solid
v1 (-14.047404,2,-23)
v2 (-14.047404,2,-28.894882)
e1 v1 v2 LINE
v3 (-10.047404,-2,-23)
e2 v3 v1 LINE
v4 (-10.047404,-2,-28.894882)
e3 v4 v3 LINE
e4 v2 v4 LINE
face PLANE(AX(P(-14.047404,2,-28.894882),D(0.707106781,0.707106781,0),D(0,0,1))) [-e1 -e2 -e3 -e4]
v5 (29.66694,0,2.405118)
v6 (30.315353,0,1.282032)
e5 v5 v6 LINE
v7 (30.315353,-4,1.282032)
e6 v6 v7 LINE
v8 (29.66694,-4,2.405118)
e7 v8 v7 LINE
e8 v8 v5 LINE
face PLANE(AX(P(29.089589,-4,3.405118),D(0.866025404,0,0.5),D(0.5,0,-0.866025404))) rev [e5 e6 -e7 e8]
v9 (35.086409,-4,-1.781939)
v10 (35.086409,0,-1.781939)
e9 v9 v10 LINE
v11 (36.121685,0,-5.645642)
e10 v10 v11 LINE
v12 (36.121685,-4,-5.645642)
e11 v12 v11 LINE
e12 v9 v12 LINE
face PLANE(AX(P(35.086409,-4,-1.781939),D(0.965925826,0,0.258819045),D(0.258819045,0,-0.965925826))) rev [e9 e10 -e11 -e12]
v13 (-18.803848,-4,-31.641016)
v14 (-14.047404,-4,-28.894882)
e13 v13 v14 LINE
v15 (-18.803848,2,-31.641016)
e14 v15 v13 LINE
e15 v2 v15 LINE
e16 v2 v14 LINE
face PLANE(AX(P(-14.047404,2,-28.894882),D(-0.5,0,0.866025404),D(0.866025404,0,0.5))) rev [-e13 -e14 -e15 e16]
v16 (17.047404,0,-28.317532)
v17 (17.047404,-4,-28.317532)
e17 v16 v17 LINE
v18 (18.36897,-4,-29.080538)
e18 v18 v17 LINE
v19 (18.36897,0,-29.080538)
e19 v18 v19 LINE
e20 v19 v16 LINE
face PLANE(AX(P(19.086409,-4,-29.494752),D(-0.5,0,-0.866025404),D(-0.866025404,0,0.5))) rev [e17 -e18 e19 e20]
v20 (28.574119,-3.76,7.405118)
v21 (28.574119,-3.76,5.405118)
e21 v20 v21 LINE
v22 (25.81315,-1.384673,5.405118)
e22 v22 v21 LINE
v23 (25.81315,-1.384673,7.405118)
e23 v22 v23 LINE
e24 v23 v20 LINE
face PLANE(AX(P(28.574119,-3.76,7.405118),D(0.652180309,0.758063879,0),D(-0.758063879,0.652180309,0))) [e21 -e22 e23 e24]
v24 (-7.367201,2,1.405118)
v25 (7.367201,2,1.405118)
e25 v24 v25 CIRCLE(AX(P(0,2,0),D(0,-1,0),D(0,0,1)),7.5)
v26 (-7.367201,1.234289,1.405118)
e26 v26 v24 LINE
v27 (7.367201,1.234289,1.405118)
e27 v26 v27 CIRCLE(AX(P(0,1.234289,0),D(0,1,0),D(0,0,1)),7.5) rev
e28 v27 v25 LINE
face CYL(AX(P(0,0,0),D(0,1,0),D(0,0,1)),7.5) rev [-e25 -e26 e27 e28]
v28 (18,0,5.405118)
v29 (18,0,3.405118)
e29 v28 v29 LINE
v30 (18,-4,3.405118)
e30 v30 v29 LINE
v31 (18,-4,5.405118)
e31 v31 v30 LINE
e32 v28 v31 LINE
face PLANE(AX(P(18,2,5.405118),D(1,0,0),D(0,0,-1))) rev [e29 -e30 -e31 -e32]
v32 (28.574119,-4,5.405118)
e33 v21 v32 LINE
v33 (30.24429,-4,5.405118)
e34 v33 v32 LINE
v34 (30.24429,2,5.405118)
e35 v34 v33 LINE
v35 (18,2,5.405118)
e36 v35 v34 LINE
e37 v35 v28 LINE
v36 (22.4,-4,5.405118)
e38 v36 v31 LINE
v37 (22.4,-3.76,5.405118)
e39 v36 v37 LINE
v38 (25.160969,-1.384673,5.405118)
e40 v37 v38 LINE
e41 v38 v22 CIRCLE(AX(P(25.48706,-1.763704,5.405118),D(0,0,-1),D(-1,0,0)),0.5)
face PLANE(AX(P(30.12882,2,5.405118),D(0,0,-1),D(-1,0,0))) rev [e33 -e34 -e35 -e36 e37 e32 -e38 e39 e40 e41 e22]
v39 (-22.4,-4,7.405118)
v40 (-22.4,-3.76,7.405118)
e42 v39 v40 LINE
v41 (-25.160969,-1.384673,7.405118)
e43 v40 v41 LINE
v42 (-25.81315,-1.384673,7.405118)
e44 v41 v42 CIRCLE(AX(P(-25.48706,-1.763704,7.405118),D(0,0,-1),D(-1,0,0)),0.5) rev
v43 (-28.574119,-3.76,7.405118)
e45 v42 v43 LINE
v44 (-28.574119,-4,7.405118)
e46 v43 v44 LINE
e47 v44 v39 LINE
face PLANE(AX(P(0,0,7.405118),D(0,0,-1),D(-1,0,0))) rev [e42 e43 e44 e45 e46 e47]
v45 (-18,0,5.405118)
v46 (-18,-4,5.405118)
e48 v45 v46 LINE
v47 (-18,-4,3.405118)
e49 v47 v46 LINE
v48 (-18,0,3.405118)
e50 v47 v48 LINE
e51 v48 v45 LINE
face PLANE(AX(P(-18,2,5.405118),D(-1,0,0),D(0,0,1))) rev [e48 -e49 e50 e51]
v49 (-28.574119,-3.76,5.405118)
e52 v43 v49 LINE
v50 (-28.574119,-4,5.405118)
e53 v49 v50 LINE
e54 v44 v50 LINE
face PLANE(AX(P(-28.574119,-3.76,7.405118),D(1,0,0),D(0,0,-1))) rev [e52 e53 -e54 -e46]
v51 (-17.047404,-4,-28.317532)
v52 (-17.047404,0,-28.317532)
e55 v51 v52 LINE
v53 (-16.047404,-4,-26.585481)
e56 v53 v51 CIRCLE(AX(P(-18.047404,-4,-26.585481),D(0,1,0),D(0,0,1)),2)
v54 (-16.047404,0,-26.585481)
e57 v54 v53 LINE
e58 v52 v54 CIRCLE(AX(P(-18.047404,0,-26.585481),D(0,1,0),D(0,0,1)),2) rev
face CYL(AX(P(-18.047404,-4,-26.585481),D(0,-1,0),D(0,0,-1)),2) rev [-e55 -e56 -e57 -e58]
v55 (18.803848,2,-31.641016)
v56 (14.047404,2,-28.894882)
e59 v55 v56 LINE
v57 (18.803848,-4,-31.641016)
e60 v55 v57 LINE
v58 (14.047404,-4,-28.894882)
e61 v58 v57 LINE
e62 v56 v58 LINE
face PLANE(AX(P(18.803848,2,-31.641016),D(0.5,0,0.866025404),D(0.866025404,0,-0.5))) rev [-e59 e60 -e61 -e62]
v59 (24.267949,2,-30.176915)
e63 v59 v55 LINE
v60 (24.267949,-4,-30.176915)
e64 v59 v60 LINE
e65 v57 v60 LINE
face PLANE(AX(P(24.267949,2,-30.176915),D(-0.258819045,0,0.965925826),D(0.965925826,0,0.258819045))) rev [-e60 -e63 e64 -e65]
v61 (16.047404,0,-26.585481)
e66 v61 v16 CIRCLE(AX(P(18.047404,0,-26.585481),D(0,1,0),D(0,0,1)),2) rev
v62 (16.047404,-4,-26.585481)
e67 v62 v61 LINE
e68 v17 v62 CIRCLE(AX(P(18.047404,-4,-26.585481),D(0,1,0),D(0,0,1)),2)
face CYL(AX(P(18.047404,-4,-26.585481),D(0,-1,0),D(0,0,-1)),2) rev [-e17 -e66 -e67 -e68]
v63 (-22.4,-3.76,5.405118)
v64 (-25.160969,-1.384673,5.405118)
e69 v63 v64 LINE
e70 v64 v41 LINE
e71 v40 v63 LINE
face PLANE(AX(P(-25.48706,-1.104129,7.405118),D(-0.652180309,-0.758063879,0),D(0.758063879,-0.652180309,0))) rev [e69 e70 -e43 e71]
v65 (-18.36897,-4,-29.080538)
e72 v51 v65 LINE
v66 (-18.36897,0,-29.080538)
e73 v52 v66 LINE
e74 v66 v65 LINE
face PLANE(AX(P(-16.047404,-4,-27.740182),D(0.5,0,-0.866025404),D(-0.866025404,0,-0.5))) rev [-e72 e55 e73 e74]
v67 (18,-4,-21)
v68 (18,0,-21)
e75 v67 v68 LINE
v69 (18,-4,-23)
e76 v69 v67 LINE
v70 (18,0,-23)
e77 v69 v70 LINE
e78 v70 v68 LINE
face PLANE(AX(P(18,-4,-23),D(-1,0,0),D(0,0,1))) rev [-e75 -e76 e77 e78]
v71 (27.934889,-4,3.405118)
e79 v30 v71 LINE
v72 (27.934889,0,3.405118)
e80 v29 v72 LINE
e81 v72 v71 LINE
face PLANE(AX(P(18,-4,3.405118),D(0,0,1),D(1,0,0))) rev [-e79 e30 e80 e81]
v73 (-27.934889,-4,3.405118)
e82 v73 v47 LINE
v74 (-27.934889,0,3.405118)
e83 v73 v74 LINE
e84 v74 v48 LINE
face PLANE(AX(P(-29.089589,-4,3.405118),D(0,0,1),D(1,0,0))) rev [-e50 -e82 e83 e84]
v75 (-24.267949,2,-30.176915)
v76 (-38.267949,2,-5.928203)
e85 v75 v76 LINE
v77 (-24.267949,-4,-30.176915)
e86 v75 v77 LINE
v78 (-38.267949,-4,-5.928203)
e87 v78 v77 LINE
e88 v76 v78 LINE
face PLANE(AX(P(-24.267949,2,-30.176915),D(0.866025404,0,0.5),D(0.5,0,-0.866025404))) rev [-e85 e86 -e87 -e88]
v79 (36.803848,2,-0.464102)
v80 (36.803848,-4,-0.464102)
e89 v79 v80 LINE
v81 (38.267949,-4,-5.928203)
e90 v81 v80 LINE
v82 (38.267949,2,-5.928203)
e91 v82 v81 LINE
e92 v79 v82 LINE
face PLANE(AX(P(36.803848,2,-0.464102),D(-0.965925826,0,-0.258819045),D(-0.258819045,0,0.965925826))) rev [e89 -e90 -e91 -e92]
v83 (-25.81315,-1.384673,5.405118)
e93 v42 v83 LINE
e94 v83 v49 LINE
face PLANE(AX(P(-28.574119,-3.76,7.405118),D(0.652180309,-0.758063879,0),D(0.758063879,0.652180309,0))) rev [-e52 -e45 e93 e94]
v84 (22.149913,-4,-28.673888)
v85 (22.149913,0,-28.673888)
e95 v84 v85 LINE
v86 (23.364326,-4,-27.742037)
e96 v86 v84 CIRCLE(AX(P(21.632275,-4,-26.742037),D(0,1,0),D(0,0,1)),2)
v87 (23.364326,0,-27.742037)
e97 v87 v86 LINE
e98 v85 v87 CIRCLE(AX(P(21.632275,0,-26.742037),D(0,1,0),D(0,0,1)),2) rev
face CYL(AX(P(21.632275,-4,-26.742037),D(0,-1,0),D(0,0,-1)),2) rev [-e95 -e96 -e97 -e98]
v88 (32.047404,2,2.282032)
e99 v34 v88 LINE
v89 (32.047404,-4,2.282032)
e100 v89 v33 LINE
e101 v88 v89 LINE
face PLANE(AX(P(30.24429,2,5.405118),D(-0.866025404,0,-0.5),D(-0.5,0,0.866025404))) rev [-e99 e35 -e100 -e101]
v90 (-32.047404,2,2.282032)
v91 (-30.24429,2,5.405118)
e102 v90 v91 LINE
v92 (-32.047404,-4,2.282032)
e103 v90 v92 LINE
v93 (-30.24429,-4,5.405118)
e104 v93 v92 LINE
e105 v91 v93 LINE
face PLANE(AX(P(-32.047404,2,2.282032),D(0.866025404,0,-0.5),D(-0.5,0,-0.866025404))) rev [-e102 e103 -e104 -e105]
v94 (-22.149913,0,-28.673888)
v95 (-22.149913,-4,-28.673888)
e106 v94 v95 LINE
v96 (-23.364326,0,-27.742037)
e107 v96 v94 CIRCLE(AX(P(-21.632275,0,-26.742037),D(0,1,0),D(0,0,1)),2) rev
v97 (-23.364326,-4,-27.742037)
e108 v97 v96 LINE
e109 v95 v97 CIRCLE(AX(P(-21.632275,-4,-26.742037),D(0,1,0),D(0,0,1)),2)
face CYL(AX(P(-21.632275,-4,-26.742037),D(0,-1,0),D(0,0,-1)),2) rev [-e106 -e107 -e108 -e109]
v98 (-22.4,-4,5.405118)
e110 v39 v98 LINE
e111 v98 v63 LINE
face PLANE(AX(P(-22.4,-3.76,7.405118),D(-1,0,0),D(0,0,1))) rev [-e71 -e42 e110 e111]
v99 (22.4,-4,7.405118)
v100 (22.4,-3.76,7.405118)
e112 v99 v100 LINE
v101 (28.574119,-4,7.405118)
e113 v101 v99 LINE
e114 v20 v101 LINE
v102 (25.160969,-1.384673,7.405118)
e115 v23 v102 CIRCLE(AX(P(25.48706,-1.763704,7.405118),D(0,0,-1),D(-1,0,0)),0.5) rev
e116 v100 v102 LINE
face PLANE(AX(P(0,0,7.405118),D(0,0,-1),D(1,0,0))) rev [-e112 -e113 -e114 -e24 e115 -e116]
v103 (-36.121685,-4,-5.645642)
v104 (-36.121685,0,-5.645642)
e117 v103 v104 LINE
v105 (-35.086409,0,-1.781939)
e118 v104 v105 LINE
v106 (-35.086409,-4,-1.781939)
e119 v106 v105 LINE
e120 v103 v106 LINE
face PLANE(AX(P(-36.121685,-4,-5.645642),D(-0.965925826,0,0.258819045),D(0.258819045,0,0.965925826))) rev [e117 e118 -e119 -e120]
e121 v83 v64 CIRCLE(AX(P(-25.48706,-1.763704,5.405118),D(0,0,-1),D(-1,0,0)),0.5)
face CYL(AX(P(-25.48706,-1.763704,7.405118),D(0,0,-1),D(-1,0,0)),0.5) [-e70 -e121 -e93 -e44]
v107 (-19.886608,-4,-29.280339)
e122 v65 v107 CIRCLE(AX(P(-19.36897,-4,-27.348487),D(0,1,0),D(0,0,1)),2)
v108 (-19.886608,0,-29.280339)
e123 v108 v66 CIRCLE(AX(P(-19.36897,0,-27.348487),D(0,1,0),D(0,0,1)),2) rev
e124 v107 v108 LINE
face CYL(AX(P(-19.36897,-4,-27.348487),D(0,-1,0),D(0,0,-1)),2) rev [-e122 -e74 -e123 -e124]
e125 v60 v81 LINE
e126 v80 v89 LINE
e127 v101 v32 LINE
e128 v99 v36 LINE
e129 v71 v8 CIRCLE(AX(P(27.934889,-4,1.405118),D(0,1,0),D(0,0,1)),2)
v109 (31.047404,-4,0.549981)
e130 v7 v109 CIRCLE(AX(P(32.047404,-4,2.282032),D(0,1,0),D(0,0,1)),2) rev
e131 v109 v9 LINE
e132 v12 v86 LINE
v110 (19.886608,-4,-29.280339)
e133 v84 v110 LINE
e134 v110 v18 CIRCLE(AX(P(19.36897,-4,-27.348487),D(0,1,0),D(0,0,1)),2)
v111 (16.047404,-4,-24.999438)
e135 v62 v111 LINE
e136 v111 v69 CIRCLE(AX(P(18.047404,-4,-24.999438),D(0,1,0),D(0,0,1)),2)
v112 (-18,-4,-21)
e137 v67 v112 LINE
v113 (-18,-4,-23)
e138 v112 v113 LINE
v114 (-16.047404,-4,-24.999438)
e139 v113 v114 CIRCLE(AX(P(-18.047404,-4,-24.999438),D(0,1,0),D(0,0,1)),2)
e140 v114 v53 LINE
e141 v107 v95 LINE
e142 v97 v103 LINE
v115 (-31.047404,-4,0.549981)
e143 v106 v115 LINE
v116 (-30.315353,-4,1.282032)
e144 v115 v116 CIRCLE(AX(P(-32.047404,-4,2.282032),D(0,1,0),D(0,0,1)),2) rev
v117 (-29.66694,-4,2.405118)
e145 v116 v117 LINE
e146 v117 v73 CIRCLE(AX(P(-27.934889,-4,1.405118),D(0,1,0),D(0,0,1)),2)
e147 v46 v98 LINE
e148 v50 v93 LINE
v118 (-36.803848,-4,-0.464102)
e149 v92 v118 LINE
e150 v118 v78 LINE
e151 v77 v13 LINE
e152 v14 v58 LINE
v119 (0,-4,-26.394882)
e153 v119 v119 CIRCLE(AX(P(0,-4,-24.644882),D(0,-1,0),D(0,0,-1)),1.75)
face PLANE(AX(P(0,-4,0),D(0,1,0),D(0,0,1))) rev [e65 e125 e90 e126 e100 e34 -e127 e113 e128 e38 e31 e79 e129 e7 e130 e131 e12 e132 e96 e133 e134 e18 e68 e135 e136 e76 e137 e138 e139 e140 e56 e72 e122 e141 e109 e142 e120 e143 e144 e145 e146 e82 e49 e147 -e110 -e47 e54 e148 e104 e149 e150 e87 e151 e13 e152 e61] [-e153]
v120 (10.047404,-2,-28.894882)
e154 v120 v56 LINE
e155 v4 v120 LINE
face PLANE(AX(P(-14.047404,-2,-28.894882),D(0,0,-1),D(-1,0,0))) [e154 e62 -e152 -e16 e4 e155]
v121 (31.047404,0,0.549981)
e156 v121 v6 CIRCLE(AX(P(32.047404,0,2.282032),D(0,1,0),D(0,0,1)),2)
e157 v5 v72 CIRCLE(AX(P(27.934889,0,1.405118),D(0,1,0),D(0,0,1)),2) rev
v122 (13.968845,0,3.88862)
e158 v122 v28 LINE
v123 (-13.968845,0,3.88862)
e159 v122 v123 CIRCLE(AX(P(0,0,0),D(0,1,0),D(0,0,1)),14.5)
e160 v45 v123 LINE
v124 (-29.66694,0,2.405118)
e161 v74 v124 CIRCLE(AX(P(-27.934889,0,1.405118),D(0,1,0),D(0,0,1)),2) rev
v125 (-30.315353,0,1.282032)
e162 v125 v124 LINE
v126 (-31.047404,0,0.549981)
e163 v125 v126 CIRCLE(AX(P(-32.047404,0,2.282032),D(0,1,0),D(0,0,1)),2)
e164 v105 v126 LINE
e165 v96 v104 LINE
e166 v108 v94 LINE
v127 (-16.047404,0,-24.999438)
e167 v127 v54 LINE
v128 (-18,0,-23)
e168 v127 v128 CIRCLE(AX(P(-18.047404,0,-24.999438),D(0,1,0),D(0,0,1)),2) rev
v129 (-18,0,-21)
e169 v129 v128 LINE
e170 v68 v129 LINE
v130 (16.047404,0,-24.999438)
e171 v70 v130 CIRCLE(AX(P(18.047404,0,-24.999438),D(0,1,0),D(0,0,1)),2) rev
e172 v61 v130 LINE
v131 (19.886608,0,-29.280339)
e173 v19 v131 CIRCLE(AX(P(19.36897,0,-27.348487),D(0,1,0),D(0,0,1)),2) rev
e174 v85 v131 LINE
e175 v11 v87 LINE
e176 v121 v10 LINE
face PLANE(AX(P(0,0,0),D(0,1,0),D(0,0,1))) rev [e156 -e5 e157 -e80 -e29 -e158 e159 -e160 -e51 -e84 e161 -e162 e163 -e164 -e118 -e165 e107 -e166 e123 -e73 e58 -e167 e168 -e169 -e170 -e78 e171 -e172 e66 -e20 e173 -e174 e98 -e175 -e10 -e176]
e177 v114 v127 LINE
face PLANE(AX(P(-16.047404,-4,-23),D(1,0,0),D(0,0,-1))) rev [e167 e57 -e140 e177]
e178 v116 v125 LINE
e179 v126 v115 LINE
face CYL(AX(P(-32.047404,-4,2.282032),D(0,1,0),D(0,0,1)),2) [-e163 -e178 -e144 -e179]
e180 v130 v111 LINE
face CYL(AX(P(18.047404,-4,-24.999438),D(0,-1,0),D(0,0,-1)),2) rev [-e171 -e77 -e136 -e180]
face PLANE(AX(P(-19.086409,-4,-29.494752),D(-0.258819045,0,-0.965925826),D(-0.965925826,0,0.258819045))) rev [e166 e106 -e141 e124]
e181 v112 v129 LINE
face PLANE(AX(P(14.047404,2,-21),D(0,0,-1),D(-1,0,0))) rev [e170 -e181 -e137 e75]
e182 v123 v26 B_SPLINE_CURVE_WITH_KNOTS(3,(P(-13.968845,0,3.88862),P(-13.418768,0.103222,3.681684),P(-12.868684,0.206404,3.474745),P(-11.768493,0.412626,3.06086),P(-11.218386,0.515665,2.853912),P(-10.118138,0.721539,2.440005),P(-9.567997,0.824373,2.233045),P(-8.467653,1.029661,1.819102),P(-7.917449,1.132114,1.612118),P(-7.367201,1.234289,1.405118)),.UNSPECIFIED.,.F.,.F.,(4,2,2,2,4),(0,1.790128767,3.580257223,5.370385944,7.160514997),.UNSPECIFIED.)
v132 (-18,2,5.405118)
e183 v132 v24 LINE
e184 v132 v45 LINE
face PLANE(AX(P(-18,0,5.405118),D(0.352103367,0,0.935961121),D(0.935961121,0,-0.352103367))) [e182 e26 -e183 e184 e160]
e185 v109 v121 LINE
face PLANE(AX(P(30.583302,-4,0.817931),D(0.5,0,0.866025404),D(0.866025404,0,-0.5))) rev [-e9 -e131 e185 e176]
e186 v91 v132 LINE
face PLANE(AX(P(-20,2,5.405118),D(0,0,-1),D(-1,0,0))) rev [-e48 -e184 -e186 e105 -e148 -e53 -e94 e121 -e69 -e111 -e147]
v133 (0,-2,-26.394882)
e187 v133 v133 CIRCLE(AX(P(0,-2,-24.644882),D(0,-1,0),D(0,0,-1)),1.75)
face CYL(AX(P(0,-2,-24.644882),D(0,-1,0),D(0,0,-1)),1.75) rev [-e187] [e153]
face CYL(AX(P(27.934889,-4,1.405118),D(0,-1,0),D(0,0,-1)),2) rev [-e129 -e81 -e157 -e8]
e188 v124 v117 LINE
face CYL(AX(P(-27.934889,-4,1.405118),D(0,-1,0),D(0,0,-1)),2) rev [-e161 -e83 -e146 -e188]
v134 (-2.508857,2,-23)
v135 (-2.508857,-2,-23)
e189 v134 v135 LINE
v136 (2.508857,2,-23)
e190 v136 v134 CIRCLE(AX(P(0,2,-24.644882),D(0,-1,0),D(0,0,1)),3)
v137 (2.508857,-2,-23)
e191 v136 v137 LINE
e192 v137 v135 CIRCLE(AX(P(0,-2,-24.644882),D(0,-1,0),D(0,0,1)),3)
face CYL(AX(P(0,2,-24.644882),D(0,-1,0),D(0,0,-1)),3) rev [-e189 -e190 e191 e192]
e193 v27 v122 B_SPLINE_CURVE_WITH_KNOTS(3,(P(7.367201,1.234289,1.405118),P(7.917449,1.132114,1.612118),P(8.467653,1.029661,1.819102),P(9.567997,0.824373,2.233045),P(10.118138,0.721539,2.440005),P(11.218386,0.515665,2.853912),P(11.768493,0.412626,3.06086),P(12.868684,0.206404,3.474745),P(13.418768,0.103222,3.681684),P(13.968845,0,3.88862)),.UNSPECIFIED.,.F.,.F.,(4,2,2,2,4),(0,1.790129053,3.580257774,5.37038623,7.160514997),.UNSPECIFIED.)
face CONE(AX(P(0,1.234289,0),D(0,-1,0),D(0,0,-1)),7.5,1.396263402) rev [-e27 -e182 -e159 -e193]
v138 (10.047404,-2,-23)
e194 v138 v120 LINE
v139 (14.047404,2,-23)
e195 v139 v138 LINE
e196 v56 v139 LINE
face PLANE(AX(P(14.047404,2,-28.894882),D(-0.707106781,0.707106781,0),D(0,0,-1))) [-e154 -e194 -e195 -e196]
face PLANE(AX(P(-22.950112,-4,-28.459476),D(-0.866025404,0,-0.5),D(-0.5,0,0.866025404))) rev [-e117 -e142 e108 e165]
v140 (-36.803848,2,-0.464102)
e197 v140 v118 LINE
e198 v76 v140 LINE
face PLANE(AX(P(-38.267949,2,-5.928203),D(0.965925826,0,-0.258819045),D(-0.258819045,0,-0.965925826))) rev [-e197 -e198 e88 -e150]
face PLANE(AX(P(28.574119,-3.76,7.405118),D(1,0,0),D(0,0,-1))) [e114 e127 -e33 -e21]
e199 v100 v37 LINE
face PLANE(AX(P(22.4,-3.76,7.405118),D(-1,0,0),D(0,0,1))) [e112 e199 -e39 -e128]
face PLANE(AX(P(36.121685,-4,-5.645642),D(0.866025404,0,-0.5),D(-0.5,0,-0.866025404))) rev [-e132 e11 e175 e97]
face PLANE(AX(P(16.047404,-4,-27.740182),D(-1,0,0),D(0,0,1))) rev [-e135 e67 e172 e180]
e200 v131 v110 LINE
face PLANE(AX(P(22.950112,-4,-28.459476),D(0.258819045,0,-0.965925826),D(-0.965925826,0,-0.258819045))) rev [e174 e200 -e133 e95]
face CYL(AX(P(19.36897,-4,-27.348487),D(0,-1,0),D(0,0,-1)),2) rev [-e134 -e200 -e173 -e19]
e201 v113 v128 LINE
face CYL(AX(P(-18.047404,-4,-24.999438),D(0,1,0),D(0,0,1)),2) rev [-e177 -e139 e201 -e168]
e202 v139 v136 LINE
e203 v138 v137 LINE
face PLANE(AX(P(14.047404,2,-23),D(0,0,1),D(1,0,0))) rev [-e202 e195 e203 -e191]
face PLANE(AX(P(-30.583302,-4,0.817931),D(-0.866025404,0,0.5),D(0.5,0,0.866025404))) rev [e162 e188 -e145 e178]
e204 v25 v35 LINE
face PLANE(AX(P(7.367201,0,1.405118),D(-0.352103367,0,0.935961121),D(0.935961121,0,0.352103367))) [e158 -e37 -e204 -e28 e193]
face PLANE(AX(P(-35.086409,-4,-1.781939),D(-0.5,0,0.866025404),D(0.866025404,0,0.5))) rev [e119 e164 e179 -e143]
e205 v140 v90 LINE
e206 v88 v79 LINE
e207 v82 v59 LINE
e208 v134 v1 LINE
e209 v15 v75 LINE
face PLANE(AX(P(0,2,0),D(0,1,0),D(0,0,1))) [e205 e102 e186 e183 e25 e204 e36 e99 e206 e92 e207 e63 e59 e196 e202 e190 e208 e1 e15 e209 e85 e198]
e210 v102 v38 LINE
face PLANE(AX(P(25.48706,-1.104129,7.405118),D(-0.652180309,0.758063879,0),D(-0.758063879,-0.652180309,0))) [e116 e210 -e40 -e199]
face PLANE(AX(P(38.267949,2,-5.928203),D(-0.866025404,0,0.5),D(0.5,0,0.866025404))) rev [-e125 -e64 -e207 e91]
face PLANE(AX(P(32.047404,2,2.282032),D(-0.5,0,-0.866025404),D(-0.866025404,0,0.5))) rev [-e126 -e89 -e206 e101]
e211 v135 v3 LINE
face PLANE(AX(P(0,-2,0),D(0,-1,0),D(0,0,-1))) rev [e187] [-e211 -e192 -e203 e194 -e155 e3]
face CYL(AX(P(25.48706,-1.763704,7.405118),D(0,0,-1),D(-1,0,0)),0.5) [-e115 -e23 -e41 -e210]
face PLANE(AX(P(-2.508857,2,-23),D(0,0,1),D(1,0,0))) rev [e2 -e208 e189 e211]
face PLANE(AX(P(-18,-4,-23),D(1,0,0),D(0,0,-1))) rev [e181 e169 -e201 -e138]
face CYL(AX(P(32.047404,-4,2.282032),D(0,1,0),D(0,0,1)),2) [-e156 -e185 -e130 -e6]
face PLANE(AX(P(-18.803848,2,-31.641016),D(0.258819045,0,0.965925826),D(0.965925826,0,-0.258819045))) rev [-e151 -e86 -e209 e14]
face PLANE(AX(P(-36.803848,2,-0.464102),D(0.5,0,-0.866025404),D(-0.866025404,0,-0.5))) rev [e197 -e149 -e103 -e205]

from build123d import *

# Parameters (mm, degrees)
BOSS_EXTRUDE6_DEPTH   = 2
BOSS_EXTRUDE6_2_DEPTH = 2
BOSS_EXTRUDE7_DEPTH   = 4
SKETCH15_W            = 28.094808214
SKETCH15_H            = 7.894882233
SKETCH15_R            = 1.75
BOSS_EXTRUDE8_DEPTH   = 2
BOSS_EXTRUDE9_DEPTH   = 2
FILLET3_R             = 0.5
FILLET3_OF_MIRROR2_R  = 0.5
BOSS_EXTRUDE10_DEPTH  = 2
BOSS_EXTRUDE11_DEPTH  = 4
CHAMFER2_SIZE         = 4
FILLET4_R             = 2
CHAMFER3_SIZE         = 7
CHAMFER3_SIZE2        = 1.234288865


# Some blends are built 0.0001 mm under size
with BuildPart() as part:
    # Sketch13 → Boss-Extrude6 (new body)
    with BuildSketch(Plane(origin=(0, 0, 0), x_dir=(1, 0, 0), z_dir=(0, 1, 0))):
        Polygon((-18, 21), (-14.047404107, 21), (-14.047404107, 28.894882233), (-18.803847577, 31.641016151), (-24.267949192, 30.176914536), (-38.267949192, 5.92820323), (-36.803847577, 0.464101615), (-32.047404107, -2.282032303), (-30.244289874, -5.405117767), (-30.12881982, -5.405117767), (-20, -5.405117767), (-18, -5.405117767), align=None)
    extrude(amount=BOSS_EXTRUDE6_DEPTH)



with BuildPart() as body_2:
    # Sketch13 → Boss-Extrude6 2 (new body)
    with BuildSketch(Plane(origin=(0, 0, 0), x_dir=(1, 0, 0), z_dir=(0, 1, 0))):
        Polygon((18, -5.405117767), (18, 21), (14.047404107, 21), (14.047404107, 28.894882233), (18.803847577, 31.641016151), (24.267949192, 30.176914536), (38.267949192, 5.92820323), (36.803847577, 0.464101615), (32.047404107, -2.282032303), (30.244289874, -5.405117767), (30.12881982, -5.405117767), (26.664718205, -5.405117767), (20, -5.405117767), align=None)
    extrude(amount=BOSS_EXTRUDE6_2_DEPTH)


with BuildPart() as part_1:
    add(part.part)

    add(body_2.part)  # Boss-Extrude7 merges body 2
    # Sketch14 → Boss-Extrude7 (add)
    with BuildSketch(Plane.XZ):
        Polygon((-30.244289874, 5.405117767), (-18, 5.405117767), (-18, 3.405117767), (-29.089589336, 3.405117767), (-30.583302492, 0.817930688), (-35.086408642, -1.78193886), (-36.121684822, -5.645642165), (-22.950111947, -28.459475601), (-19.086408642, -29.494751781), (-16.047404107, -27.740181695), (-16.047404107, -23), (-18, -23), (-18, -21), (-14.047404107, -21), (-14.047404107, -28.894882233), (-18.803847577, -31.641016151), (-24.267949192, -30.176914536), (-38.267949192, -5.92820323), (-36.803847577, -0.464101615), (-32.047404107, 2.282032303), align=None)
        Polygon((14.047404107, -21), (18, -21), (18, -23), (16.047404107, -23), (16.047404107, -27.740181695), (19.086408642, -29.494751781), (22.950111947, -28.459475601), (36.121684822, -5.645642165), (35.086408642, -1.78193886), (30.583302492, 0.817930688), (29.089589336, 3.405117767), (18, 3.405117767), (18, 5.405117767), (30.244289874, 5.405117767), (32.047404107, 2.282032303), (36.803847577, -0.464101615), (38.267949192, -5.92820323), (24.267949192, -30.176914536), (18.803847577, -31.641016151), (14.047404107, -28.894882233), align=None)
    extrude(amount=BOSS_EXTRUDE7_DEPTH)

    # Sketch15 → Boss-Extrude8 (add)
    with BuildSketch(Plane.XZ.offset(4)):
        with Locations((0, -24.947441117)):
            Rectangle(SKETCH15_W, SKETCH15_H)
        with Locations(Location((0, -24.644882233, 0), (0, 0, 270))):
            Circle(SKETCH15_R, mode=Mode.SUBTRACT)
    extrude(amount=-BOSS_EXTRUDE8_DEPTH)

    # Sketch16 → Boss-Extrude9 (add)
    with BuildSketch(Plane.XY.offset(5.405117767)):
        Polygon((-28.574119282, -3.76), (-28.574119282, -4), (-22.4, -4), (-22.4, -3.76), (-25.487059641, -1.104129474), align=None)
    boss_extrude9 = extrude(amount=BOSS_EXTRUDE9_DEPTH)

    # Fillet3
    fillet3_edges = [part_1.edges().sort_by_distance(p)[0] for p in [
        (-25.487059641, -1.104129474, 6.405117767),
    ]]
    fillet(fillet3_edges, radius=FILLET3_R)

    # Mirror2: Boss-Extrude9 across plane
    add(boss_extrude9.mirror(Plane(origin=(0, 0, 0), x_dir=(0, 0, 1), z_dir=(1, 0, 0))))

    # Fillet3 of Mirror2
    fillet3_of_mirror2_edges = [part_1.edges().sort_by_distance(p)[0] for p in [
        (25.487059641, -1.104129474, 6.405117767),
    ]]
    fillet(fillet3_of_mirror2_edges, radius=FILLET3_OF_MIRROR2_R)

    # Sketch17 → Boss-Extrude10 (add)
    with BuildSketch(Plane(origin=(0, 2, 0), x_dir=(1, 0, 0), z_dir=(0, 1, 0))):
        with BuildLine():
            Line((-18, -5.405117767), (-7.367200558, -1.405117767))
            ThreePointArc((-7.367200558, -1.405117767), (0, 7.5), (7.367200558, -1.405117767))
            Line((7.367200558, -1.405117767), (18, -5.405117767))
            Line((18, -5.405117767), (18, 21))
            Line((18, 21), (-18, 21))
            Line((-18, 21), (-18, -5.405117767))
        make_face()
    extrude(amount=-BOSS_EXTRUDE10_DEPTH)

    # Sketch18 → Boss-Extrude11 (add)
    with BuildSketch(Plane(origin=(0, -2, 0), x_dir=(1, 0, 0), z_dir=(0, 1, 0))):
        with BuildLine():
            Line((14.047404107, 21), (-14.047404107, 21))
            Line((-14.047404107, 21), (-14.047404107, 23))
            Line((-14.047404107, 23), (-2.508856799, 23))
            ThreePointArc((-2.508856799, 23), (0, 21.644882233), (2.508856799, 23))
            Line((2.508856799, 23), (14.047404107, 23))
            Line((14.047404107, 23), (14.047404107, 21))
        make_face()
    extrude(amount=BOSS_EXTRUDE11_DEPTH)

    # Chamfer2
    chamfer2_edges = [part_1.edges().sort_by_distance(p)[0] for p in [
        (14.047404107, -2, -25.947441117),
        (-14.047404107, -2, -25.947441117),
    ]]
    chamfer(chamfer2_edges, length=CHAMFER2_SIZE - 0.0001)  # a hair under: the kernel refuses the full size

    # Fillet4
    # the kernel refuses this fillet: 2 mm, written as the material it adds along each edge
    with BuildSketch(Plane(origin=(29.089589336, 2.886751346, 3.405117767), x_dir=(0.4999999999999999, 0, -0.8660254037844386), z_dir=(0, -1, 0))) as fillet4_piece_1_section:
        with BuildLine():
            CenterArc((FILLET4_R * 0.57735026919, -FILLET4_R), FILLET4_R, 90, 60)
            Line((-FILLET4_R * 0.288675134595, -FILLET4_R * 0.5), (0, 0))
            Line((0, 0), (FILLET4_R * 0.57735026919, 0))
        make_face()
    fillet4_piece_1 = extrude(amount=6.886751346, mode=Mode.PRIVATE)
    fillet4_piece_1 = split(fillet4_piece_1, bisect_by=Plane(origin=(28.968451808, 2, 3.195301414), z_dir=(0, -1, 0)), keep=Keep.TOP, mode=Mode.PRIVATE)
    add(fillet4_piece_1)
    with BuildSketch(Plane(origin=(-29.089589336, 2.886751346, 3.405117767), x_dir=(1, 0, 0), z_dir=(0, -1, 0))) as fillet4_piece_2_section:
        with BuildLine():
            CenterArc((FILLET4_R * 0.57735026919, -FILLET4_R), FILLET4_R, 90, 60)
            Line((-FILLET4_R * 0.288675134595, -FILLET4_R * 0.5), (0, 0))
            Line((0, 0), (FILLET4_R * 0.57735026919, 0))
        make_face()
    fillet4_piece_2 = extrude(amount=6.886751346, mode=Mode.PRIVATE)
    fillet4_piece_2 = split(fillet4_piece_2, bisect_by=Plane(origin=(-28.968451808, 2, 3.195301414), z_dir=(0, -1, 0)), keep=Keep.TOP, mode=Mode.PRIVATE)
    add(fillet4_piece_2)
    with BuildSketch(Plane(origin=(22.950111947, 2.071067812, -28.459475601), x_dir=(-0.9659258262890683, 0, -0.2588190451025206), z_dir=(0, -1, 0))) as fillet4_piece_3_section:
        with BuildLine():
            CenterArc((FILLET4_R * 0.414213562373, -FILLET4_R), FILLET4_R, 90, 45)
            Line((-FILLET4_R * 0.292893218813, -FILLET4_R * 0.292893218813), (0, 0))
            Line((0, 0), (FILLET4_R * 0.414213562373, 0))
        make_face()
    fillet4_piece_3 = extrude(amount=6.071067812, mode=Mode.PRIVATE)
    fillet4_piece_3 = split(fillet4_piece_3, bisect_by=Plane(origin=(22.870823982, 2, -28.356145514), z_dir=(0, -1, 0)), keep=Keep.TOP, mode=Mode.PRIVATE)
    add(fillet4_piece_3)
    with BuildSketch(Plane(origin=(19.086408642, 2.071067812, -29.494751781), x_dir=(-0.8660254037844382, 0, 0.500000000000001), z_dir=(0, -1, 0))) as fillet4_piece_4_section:
        with BuildLine():
            CenterArc((FILLET4_R * 0.414213562373, -FILLET4_R), FILLET4_R, 90, 45)
            Line((-FILLET4_R * 0.292893218813, -FILLET4_R * 0.292893218813), (0, 0))
            Line((0, 0), (FILLET4_R * 0.414213562373, 0))
        make_face()
    fillet4_piece_4 = extrude(amount=6.071067812, mode=Mode.PRIVATE)
    fillet4_piece_4 = split(fillet4_piece_4, bisect_by=Plane(origin=(19.10340899, 2, -29.365621318), z_dir=(0, -1, 0)), keep=Keep.TOP, mode=Mode.PRIVATE)
    add(fillet4_piece_4)
    with BuildSketch(Plane(origin=(16.047404107, 2.886751346, -27.740181695), x_dir=(0, 0, 1), z_dir=(0, -1, 0))) as fillet4_piece_5_section:
        with BuildLine():
            CenterArc((FILLET4_R * 0.57735026919, -FILLET4_R), FILLET4_R, 90, 60)
            Line((-FILLET4_R * 0.288675134595, -FILLET4_R * 0.5), (0, 0))
            Line((0, 0), (FILLET4_R * 0.57735026919, 0))
        make_face()
    fillet4_piece_5 = extrude(amount=6.886751346, mode=Mode.PRIVATE)
    fillet4_piece_5 = split(fillet4_piece_5, bisect_by=Plane(origin=(16.257220459, 2, -27.619044168), z_dir=(0, -1, 0)), keep=Keep.TOP, mode=Mode.PRIVATE)
    add(fillet4_piece_5)
    with BuildSketch(Plane(origin=(-22.950111947, 2.071067812, -28.459475601), x_dir=(-0.500000000000001, 0, 0.8660254037844382), z_dir=(0, -1, 0))) as fillet4_piece_6_section:
        with BuildLine():
            CenterArc((FILLET4_R * 0.414213562373, -FILLET4_R), FILLET4_R, 90, 45)
            Line((-FILLET4_R * 0.292893218813, -FILLET4_R * 0.292893218813), (0, 0))
            Line((0, 0), (FILLET4_R * 0.414213562373, 0))
        make_face()
    fillet4_piece_6 = extrude(amount=6.071067812, mode=Mode.PRIVATE)
    fillet4_piece_6 = split(fillet4_piece_6, bisect_by=Plane(origin=(-22.870823982, 2, -28.356145514), z_dir=(0, -1, 0)), keep=Keep.TOP, mode=Mode.PRIVATE)
    add(fillet4_piece_6)
    with BuildSketch(Plane(origin=(-19.086408642, 2.071067812, -29.494751781), x_dir=(-0.9659258262890694, 0, 0.2588190451025166), z_dir=(0, -1, 0))) as fillet4_piece_7_section:
        with BuildLine():
            CenterArc((FILLET4_R * 0.414213562373, -FILLET4_R), FILLET4_R, 90, 45)
            Line((-FILLET4_R * 0.292893218813, -FILLET4_R * 0.292893218813), (0, 0))
            Line((0, 0), (FILLET4_R * 0.414213562373, 0))
        make_face()
    fillet4_piece_7 = extrude(amount=6.071067812, mode=Mode.PRIVATE)
    fillet4_piece_7 = split(fillet4_piece_7, bisect_by=Plane(origin=(-19.10340899, 2, -29.365621318), z_dir=(0, -1, 0)), keep=Keep.TOP, mode=Mode.PRIVATE)
    add(fillet4_piece_7)
    with BuildSketch(Plane(origin=(-16.047404107, 2.886751346, -27.740181695), x_dir=(-0.8660254037844385, 0, -0.5000000000000003), z_dir=(0, -1, 0))) as fillet4_piece_8_section:
        with BuildLine():
            CenterArc((FILLET4_R * 0.57735026919, -FILLET4_R), FILLET4_R, 90, 60)
            Line((-FILLET4_R * 0.288675134595, -FILLET4_R * 0.5), (0, 0))
            Line((0, 0), (FILLET4_R * 0.57735026919, 0))
        make_face()
    fillet4_piece_8 = extrude(amount=6.886751346, mode=Mode.PRIVATE)
    fillet4_piece_8 = split(fillet4_piece_8, bisect_by=Plane(origin=(-16.257220459, 2, -27.619044168), z_dir=(0, -1, 0)), keep=Keep.TOP, mode=Mode.PRIVATE)
    add(fillet4_piece_8)
    with BuildSketch(Plane(origin=(-16.047404107, 5, -23), x_dir=(0, 0, -1), z_dir=(0, -1, 0))) as fillet4_piece_9_section:
        with BuildLine():
            CenterArc((FILLET4_R, -FILLET4_R), FILLET4_R, 90, 90)
            Line((0, -FILLET4_R), (0, 0))
            Line((0, 0), (FILLET4_R, 0))
        make_face()
    fillet4_piece_9 = extrude(amount=9, mode=Mode.PRIVATE)
    fillet4_piece_9 = split(fillet4_piece_9, bisect_by=Plane(origin=(-18, -2, -23.446740496), z_dir=(1, 0, 0)), keep=Keep.TOP, mode=Mode.PRIVATE)
    fillet4_piece_9 = split(fillet4_piece_9, bisect_by=Plane(origin=(-16.494124288, 2, -23.446740496), z_dir=(0, -1, 0)), keep=Keep.TOP, mode=Mode.PRIVATE)
    add(fillet4_piece_9)
    with BuildSketch(Plane(origin=(16.047404107, 5, -23), x_dir=(1, 0, 0), z_dir=(0, -1, 0))) as fillet4_piece_10_section:
        with BuildLine():
            CenterArc((FILLET4_R, -FILLET4_R), FILLET4_R, 90, 90)
            Line((0, -FILLET4_R), (0, 0))
            Line((0, 0), (FILLET4_R, 0))
        make_face()
    fillet4_piece_10 = extrude(amount=9, mode=Mode.PRIVATE)
    fillet4_piece_10 = split(fillet4_piece_10, bisect_by=Plane(origin=(18, -2, -23.446740496), z_dir=(-1, 0, 0)), keep=Keep.TOP, mode=Mode.PRIVATE)
    fillet4_piece_10 = split(fillet4_piece_10, bisect_by=Plane(origin=(16.494124288, 2, -23.446740496), z_dir=(0, -1, 0)), keep=Keep.TOP, mode=Mode.PRIVATE)
    add(fillet4_piece_10)
    # the kernel refuses this fillet: 2 mm, written as the material it takes off along each edge
    with BuildSketch(Plane(origin=(30.583302492, 0, 0.817930688), x_dir=(0.8660254037844376, 0, -0.500000000000002), z_dir=(0, -1, 0)), Plane(origin=(-30.583302492, 0, 0.817930688), x_dir=(0.5000000000000039, 0, 0.8660254037844364), z_dir=(0, -1, 0))) as fillet4_2_piece_1:
        with BuildLine():
            CenterArc((FILLET4_R * 0.267949192431, FILLET4_R), FILLET4_R, 240, 30)
            Line((-FILLET4_R * 0.232050807569, FILLET4_R * 0.133974596216), (0, 0))
            Line((0, 0), (FILLET4_R * 0.267949192431, 0))
        make_face()
    extrude(amount=5.339745962, mode=Mode.SUBTRACT)

    # Chamfer3
    chamfer3_edges = [part_1.edges().sort_by_distance(p)[0] for p in [
        (0, 0, -7.5),
    ]]
    chamfer3_side = [part_1.faces().sort_by_distance(p)[0] for p in [
        (0, 0, -10.489967156),
    ]]
    chamfer(chamfer3_edges, length=CHAMFER3_SIZE, length2=CHAMFER3_SIZE2, reference=chamfer3_side[0])


solid = part_1.part
